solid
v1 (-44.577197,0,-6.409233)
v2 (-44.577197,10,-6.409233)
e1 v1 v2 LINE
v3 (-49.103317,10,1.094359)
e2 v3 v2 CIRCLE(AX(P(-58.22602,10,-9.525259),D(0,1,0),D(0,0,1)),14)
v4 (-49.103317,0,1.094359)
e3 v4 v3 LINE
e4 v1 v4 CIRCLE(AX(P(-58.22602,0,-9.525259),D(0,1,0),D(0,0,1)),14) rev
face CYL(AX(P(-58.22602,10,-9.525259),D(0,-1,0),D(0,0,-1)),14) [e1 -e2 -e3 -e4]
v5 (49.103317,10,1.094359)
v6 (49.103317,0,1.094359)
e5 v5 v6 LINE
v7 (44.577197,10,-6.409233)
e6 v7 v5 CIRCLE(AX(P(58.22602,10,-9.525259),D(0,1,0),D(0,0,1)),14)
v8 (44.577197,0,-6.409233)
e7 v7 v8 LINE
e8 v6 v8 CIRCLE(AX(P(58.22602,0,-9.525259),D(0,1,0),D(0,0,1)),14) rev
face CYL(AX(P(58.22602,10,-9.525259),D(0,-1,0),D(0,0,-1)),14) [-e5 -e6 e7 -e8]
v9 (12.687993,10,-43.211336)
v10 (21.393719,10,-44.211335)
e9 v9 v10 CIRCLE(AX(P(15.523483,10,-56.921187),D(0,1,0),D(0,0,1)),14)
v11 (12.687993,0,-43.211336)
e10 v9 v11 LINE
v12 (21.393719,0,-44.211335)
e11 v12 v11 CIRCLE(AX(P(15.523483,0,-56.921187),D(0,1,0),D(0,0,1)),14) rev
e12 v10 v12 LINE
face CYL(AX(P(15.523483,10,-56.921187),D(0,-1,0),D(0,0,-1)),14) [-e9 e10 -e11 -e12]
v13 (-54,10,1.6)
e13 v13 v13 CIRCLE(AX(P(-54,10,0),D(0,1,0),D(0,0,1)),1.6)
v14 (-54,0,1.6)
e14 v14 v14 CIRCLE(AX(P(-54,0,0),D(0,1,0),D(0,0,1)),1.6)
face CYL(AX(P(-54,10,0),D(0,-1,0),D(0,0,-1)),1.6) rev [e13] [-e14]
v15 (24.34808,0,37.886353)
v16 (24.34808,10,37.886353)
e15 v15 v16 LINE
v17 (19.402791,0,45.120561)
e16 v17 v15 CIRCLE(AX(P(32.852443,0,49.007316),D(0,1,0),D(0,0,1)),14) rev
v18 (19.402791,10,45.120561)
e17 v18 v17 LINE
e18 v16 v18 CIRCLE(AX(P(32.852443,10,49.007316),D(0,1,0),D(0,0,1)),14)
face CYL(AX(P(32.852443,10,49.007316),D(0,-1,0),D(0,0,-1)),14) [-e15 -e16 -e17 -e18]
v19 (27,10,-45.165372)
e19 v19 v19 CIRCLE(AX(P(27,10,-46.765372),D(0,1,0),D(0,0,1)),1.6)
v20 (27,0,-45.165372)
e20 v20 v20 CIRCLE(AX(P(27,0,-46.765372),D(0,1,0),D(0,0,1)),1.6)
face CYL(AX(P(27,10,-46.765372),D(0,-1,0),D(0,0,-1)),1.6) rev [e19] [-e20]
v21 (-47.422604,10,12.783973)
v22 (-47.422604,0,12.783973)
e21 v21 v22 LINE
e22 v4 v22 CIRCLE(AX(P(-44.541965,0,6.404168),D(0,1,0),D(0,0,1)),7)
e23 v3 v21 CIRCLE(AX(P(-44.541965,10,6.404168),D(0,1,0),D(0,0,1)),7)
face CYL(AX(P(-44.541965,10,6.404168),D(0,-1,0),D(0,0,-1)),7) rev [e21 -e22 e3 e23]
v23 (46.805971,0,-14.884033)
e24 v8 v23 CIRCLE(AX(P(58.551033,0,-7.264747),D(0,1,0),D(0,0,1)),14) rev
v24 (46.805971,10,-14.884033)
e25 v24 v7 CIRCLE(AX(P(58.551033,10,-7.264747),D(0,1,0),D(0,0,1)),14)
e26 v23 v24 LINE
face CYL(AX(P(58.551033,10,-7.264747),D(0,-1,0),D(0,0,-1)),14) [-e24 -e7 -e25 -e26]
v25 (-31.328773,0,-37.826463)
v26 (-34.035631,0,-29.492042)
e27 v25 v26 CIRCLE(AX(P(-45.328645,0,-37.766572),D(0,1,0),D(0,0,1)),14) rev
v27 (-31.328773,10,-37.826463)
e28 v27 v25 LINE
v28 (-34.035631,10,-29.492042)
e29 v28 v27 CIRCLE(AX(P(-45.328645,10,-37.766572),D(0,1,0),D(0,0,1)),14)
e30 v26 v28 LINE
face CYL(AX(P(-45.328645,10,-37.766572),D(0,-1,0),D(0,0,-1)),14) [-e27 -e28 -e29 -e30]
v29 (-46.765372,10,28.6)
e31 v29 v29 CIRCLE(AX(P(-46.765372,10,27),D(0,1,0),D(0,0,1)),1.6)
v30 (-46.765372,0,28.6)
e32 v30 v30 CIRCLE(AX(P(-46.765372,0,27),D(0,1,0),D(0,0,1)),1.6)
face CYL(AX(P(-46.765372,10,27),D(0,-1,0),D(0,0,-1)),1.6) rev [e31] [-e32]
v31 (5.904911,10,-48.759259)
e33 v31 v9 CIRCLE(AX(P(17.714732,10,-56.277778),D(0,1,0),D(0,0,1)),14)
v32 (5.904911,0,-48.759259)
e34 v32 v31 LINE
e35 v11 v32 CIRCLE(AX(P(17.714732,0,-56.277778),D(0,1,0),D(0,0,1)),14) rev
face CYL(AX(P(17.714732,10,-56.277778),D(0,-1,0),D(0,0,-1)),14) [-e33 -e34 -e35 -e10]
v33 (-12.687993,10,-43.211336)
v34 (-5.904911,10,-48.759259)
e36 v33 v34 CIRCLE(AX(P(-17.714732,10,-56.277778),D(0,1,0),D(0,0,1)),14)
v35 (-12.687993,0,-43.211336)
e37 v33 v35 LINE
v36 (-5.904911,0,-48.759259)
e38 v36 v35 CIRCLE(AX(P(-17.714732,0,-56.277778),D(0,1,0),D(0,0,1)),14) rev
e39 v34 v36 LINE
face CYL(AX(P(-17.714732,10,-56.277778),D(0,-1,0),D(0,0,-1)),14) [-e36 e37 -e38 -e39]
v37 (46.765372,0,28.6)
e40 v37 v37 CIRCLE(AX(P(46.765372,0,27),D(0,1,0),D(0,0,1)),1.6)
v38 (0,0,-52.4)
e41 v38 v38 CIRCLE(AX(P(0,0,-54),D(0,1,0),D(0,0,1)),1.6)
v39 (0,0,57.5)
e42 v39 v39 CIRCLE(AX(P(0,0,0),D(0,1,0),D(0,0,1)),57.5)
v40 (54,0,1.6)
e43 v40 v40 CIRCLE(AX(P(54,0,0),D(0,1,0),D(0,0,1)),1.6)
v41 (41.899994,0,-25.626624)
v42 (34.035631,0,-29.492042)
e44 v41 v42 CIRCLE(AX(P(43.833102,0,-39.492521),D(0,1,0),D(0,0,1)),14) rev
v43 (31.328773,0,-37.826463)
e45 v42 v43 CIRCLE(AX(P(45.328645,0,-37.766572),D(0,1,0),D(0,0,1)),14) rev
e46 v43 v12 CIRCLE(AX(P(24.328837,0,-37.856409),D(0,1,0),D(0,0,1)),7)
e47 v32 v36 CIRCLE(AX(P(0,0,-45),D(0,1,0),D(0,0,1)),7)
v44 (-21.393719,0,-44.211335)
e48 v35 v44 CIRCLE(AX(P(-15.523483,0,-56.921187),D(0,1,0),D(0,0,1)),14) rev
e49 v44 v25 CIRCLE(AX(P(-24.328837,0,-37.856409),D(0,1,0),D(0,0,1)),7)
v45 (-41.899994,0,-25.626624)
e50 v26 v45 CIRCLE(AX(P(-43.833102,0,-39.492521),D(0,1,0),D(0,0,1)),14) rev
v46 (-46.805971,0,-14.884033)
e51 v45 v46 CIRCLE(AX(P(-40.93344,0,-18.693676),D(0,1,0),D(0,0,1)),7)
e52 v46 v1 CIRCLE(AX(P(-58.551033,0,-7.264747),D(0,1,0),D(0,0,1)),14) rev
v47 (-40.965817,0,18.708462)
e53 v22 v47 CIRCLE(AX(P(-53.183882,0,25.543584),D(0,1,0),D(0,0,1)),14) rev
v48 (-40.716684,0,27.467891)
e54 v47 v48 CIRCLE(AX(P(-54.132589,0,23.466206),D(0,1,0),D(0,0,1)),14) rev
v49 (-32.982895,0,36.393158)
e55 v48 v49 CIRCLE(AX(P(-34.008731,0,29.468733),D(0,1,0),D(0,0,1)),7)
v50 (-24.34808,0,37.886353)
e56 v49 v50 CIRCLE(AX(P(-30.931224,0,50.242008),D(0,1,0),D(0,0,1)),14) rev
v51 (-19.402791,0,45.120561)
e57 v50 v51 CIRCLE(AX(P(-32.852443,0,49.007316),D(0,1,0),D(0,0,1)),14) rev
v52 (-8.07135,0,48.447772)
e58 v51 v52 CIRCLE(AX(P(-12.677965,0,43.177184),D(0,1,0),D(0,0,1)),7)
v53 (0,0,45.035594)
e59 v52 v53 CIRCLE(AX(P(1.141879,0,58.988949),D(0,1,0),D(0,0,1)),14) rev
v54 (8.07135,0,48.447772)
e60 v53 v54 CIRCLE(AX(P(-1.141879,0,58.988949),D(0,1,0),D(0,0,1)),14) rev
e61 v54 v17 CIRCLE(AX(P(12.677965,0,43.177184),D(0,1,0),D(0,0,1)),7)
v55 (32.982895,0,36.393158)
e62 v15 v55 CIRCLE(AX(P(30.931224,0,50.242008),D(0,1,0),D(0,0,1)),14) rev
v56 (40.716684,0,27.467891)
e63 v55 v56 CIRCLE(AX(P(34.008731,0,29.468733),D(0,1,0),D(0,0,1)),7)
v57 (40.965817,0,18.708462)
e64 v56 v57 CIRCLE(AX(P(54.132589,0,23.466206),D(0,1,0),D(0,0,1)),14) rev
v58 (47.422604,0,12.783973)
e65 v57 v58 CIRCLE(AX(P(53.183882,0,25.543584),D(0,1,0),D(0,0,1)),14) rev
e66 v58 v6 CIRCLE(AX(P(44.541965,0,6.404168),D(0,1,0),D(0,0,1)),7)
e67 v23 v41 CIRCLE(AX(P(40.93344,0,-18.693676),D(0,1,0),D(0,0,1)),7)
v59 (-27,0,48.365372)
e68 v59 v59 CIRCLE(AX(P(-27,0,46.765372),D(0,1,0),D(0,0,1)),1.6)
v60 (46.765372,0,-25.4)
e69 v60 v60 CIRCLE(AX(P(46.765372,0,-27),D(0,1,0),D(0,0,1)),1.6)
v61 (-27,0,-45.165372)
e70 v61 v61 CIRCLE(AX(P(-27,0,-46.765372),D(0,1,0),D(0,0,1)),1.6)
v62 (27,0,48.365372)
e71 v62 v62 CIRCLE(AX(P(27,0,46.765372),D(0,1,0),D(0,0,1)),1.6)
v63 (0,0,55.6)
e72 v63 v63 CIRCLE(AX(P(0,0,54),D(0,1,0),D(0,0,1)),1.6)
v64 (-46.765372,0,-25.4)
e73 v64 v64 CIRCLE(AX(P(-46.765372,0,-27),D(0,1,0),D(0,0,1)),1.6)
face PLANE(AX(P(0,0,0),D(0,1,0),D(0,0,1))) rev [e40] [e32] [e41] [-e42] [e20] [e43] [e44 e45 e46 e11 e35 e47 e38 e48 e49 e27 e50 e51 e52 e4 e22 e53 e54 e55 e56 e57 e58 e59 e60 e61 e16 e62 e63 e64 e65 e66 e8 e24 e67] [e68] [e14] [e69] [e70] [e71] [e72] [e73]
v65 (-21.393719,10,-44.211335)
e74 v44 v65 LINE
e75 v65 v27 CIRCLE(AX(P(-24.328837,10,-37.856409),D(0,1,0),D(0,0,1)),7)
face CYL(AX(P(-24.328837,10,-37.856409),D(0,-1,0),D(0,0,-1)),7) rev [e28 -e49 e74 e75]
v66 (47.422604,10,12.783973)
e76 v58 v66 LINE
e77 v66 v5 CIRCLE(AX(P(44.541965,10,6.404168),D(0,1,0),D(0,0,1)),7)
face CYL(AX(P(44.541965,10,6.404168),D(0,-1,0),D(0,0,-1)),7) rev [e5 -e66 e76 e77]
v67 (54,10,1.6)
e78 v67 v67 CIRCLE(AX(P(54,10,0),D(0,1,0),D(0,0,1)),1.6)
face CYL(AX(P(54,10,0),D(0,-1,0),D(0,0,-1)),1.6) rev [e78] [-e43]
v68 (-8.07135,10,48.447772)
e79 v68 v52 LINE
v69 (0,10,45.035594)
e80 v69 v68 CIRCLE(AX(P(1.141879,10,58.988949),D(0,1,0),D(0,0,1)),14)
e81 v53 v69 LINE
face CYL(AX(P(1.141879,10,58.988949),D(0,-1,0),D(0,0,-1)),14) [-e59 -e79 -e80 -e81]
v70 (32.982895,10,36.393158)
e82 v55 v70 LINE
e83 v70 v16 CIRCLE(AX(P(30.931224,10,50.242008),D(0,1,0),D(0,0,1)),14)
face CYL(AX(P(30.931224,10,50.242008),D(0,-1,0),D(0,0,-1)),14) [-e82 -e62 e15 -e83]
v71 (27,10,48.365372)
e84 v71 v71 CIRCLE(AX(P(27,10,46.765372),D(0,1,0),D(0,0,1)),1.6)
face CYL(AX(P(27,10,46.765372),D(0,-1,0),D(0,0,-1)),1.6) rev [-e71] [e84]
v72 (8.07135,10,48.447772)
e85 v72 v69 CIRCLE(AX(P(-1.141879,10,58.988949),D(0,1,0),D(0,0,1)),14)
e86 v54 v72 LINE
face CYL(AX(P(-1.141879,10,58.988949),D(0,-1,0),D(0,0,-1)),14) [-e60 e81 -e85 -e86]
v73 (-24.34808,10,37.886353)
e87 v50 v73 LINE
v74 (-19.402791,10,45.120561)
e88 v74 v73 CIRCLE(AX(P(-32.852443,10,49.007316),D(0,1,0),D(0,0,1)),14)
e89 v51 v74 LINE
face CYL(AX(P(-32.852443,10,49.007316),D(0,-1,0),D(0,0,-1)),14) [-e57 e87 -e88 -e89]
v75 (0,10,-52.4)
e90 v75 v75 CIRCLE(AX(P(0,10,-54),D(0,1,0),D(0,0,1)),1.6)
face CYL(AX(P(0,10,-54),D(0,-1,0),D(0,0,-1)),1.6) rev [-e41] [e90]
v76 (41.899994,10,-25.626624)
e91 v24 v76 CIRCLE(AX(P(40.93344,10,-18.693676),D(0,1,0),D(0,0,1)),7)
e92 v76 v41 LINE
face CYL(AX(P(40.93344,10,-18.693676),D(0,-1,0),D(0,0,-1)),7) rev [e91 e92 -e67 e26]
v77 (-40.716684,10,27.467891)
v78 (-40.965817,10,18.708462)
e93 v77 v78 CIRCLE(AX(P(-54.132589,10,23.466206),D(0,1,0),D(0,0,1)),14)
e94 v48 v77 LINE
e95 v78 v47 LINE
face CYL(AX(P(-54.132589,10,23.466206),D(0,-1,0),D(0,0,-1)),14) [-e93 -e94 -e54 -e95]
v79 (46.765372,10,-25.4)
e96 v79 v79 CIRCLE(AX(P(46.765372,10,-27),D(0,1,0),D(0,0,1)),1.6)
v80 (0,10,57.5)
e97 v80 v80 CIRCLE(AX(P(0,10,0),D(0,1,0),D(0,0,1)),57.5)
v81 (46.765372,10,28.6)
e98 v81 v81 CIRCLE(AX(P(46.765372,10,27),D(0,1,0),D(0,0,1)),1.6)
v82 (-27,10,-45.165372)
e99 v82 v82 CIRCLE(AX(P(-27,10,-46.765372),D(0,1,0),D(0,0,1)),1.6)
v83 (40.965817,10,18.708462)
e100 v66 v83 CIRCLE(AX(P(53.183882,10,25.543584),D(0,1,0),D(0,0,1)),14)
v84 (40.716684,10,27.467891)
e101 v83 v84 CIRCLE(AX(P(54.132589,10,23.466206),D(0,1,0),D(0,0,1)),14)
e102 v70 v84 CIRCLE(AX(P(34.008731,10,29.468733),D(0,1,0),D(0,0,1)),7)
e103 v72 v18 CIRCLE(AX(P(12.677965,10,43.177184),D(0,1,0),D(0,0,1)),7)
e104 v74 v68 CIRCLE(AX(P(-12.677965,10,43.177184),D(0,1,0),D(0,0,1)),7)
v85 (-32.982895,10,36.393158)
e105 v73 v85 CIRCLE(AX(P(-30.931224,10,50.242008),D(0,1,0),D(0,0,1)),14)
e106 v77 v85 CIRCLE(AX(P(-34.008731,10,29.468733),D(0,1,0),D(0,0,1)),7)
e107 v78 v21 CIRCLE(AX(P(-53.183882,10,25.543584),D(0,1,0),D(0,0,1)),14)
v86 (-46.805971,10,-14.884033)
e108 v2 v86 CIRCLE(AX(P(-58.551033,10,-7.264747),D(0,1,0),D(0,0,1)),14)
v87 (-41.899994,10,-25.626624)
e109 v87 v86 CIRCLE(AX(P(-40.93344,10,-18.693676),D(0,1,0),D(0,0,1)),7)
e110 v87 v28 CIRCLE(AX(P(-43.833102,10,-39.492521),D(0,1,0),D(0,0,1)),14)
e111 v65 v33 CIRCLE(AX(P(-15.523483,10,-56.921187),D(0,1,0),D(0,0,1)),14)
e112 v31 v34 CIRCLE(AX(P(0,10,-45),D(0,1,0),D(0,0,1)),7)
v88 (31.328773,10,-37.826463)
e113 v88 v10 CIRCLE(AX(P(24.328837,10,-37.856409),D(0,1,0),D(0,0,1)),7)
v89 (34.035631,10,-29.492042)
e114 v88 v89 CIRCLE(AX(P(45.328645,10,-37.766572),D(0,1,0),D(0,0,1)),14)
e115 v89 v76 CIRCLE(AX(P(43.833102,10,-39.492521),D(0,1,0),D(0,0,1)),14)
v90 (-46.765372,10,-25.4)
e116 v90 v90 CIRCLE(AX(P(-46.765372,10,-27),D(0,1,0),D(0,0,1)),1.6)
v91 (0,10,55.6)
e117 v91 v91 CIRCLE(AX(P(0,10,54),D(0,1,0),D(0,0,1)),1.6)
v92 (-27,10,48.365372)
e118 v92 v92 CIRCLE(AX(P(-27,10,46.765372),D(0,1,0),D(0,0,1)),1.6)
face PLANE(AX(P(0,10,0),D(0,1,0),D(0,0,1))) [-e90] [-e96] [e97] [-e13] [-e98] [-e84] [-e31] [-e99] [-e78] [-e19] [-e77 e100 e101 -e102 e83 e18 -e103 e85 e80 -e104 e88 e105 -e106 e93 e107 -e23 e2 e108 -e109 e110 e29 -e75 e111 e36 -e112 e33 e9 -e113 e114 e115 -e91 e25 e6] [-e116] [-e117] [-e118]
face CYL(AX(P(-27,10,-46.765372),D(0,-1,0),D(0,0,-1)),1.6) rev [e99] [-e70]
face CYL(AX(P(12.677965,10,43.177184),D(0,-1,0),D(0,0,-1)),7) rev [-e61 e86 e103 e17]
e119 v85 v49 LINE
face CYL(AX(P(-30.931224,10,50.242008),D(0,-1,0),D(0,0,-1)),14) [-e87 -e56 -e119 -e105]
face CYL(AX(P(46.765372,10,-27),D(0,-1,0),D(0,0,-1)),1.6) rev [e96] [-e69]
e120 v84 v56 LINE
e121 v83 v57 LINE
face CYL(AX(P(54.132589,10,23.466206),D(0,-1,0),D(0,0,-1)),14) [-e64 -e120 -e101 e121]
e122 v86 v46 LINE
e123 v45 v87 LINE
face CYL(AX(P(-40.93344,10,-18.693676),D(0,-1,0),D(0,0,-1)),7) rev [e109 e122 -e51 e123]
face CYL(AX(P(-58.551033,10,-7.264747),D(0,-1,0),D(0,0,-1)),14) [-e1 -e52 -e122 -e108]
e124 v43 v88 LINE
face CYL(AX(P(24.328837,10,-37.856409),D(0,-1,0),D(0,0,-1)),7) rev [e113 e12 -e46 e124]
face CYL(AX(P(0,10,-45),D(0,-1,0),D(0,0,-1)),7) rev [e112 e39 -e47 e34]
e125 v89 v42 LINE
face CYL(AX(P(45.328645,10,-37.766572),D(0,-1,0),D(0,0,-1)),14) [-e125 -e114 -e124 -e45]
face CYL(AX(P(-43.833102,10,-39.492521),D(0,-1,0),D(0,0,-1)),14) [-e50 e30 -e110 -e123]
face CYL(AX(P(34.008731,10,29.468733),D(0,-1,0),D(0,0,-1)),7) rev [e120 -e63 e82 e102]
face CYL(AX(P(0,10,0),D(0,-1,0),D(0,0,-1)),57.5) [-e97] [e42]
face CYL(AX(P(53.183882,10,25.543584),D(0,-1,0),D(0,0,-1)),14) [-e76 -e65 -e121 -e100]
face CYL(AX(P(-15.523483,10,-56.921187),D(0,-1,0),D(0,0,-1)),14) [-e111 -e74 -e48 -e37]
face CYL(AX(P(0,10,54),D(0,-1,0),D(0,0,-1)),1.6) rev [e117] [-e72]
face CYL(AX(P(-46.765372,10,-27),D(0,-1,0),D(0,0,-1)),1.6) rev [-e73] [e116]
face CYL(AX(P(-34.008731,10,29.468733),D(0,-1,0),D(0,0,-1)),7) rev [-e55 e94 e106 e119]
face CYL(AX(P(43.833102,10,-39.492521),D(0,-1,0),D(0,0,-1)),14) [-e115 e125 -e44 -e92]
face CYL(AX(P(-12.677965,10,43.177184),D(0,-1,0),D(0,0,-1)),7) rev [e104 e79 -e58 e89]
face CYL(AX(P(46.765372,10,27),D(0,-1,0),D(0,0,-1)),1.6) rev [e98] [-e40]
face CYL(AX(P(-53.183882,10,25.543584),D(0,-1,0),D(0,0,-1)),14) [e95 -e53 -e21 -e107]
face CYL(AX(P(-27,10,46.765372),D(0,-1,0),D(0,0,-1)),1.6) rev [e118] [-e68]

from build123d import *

# Parameters (mm, degrees)
SKETCH1_R           = 57.5
SKETCH1_R_2         = 1.6
BOSS_EXTRUDE1_DEPTH = 10
FILLET1_R           = 14


with BuildPart() as part:
    # Sketch1 → Boss-Extrude1 (new body)
    with BuildSketch(Plane(origin=(0, 0, 0), x_dir=(1, 0, 0), z_dir=(0, 1, 0))):
        with Locations(Location((0, 0, 0), (0, 0, 270))):
            Circle(SKETCH1_R)
        with Locations(Location((-27, -46.765371804, 0), (0, 0, 270))):
            Circle(SKETCH1_R_2, mode=Mode.SUBTRACT)
        with Locations(Location((-46.765371804, -27, 0), (0, 0, 270))):
            Circle(SKETCH1_R_2, mode=Mode.SUBTRACT)
        with Locations(Location((-54, 0, 0), (0, 0, 270))):
            Circle(SKETCH1_R_2, mode=Mode.SUBTRACT)
        with Locations(Location((0, -54, 0), (0, 0, 270))):
            Circle(SKETCH1_R_2, mode=Mode.SUBTRACT)
        with Locations(Location((27, -46.765371804, 0), (0, 0, 270))):
            Circle(SKETCH1_R_2, mode=Mode.SUBTRACT)
        with Locations(Location((46.765371804, -27, 0), (0, 0, 270))):
            Circle(SKETCH1_R_2, mode=Mode.SUBTRACT)
        with Locations(Location((-46.765371804, 27, 0), (0, 0, 270))):
            Circle(SKETCH1_R_2, mode=Mode.SUBTRACT)
        with Locations(Location((-27, 46.765371804, 0), (0, 0, 270))):
            Circle(SKETCH1_R_2, mode=Mode.SUBTRACT)
        with BuildLine():
            ThreePointArc((43.337291938, 12.119369929), (44.541964885, 6.404167722), (44.996248187, 0.581075772))
            ThreePointArc((44.996248187, 0.581075772), (49.649801174, -1.617727663), (51.541964885, -6.404167722))
            ThreePointArc((51.541964885, -6.404167722), (48.916629323, -11.868809619), (43.009876012, -13.234446171))
            ThreePointArc((43.009876012, -13.234446171), (40.933439791, -18.693675585), (38.167406032, -23.837976356))
            ThreePointArc((38.167406032, -23.837976356), (40.258159872, -26.3152212), (41.008730846, -29.468733028))
            ThreePointArc((41.008730846, -29.468733028), (36.666623102, -35.944503928), (29.027128345, -34.386419122))
            ThreePointArc((29.027128345, -34.386419122), (24.328836786, -37.856408977), (19.22068214, -40.688639423))
            ThreePointArc((19.22068214, -40.688639423), (19.562695248, -41.91207899), (19.677965058, -43.177183813))
            ThreePointArc((19.677965058, -43.177183813), (13.403758509, -50.139455271), (5.828472525, -44.620946965))
            ThreePointArc((5.828472525, -44.620946965), (0, -45), (-5.828472525, -44.620946965))
            ThreePointArc((-5.828472525, -44.620946965), (-14.650092956, -49.893634628), (-19.22068214, -40.688639423))
            ThreePointArc((-19.22068214, -40.688639423), (-24.328836785, -37.856408977), (-29.027128345, -34.386419122))
            ThreePointArc((-29.027128345, -34.386419122), (-39.298977866, -34.052758165), (-38.167406032, -23.837976356))
            ThreePointArc((-38.167406032, -23.837976356), (-40.933439791, -18.693675585), (-43.009876012, -13.234446171))
            ThreePointArc((-43.009876012, -13.234446171), (-51.470714978, -7.40037159), (-44.996248187, 0.581075772))
            ThreePointArc((-44.996248187, 0.581075772), (-44.541964885, 6.404167722), (-43.337291938, 12.119369929))
            ThreePointArc((-43.337291938, 12.119369929), (-47.300863758, 21.601580676), (-37.539099471, 24.815640449))
            ThreePointArc((-37.539099471, 24.815640449), (-34.008730846, 29.468733028), (-29.905423881, 33.625371708))
            ThreePointArc((-29.905423881, 33.625371708), (-28.113322508, 43.745183707), (-18.163551911, 41.171414622))
            ThreePointArc((-18.163551911, 41.171414622), (-12.677965058, 43.177183813), (-6.978795043, 44.455555556))
            ThreePointArc((-6.978795043, 44.455555556), (-0.272428616, 51.994696752), (7, 45))
            ThreePointArc((7, 45), (6.994696752, 44.727571384), (6.978795043, 44.455555556))
            ThreePointArc((6.978795043, 44.455555556), (12.677965058, 43.177183813), (18.163551911, 41.171414622))
            ThreePointArc((18.163551911, 41.171414622), (26.038077243, 44.644523374), (31.328836786, 37.856408977))
            ThreePointArc((31.328836786, 37.856408977), (30.963447161, 35.624381834), (29.905423881, 33.625371708))
            ThreePointArc((29.905423881, 33.625371708), (34.008730846, 29.468733028), (37.539099471, 24.815640449))
            ThreePointArc((37.539099471, 24.815640449), (44.485876825, 24.725274968), (47.933439791, 18.693675585))
            ThreePointArc((47.933439791, 18.693675585), (46.670467115, 14.68287548), (43.337291938, 12.119369929))
        make_face(mode=Mode.SUBTRACT)
        with Locations(Location((54, 0, 0), (0, 0, 270))):
            Circle(SKETCH1_R_2, mode=Mode.SUBTRACT)
        with Locations(Location((46.765371804, 27, 0), (0, 0, 270))):
            Circle(SKETCH1_R_2, mode=Mode.SUBTRACT)
        with Locations(Location((0, 54, 0), (0, 0, 270))):
            Circle(SKETCH1_R_2, mode=Mode.SUBTRACT)
        with Locations(Location((27, 46.765371804, 0), (0, 0, 270))):
            Circle(SKETCH1_R_2, mode=Mode.SUBTRACT)
    extrude(amount=BOSS_EXTRUDE1_DEPTH)

    # Fillet1
    # the kernel refuses this fillet: 14 mm, written as the material it takes off along each edge
    with BuildSketch(Plane(origin=(43.009876012, -16.77410228, 13.234446171), x_dir=(-0.3645348982341331, 0, 0.9311897271605987), z_dir=(0, 1, 0)), Plane(origin=(43.337291938, -16.77410228, -12.119369929), x_dir=(0.19677290431862063, 0, 0.9804490930823564), z_dir=(0, 1, 0)), Plane(origin=(29.027128345, -16.77410228, 34.386419122), x_dir=(-0.8101054462780665, 0, 0.586284202337582), z_dir=(0, 1, 0)), Plane(origin=(5.828472525, -16.77410228, 44.620946965), x_dir=(-0.9984732390602963, 0, 0.05523758575861507), z_dir=(0, 1, 0)), Plane(origin=(-19.22068214, -16.77410228, 40.688639423), x_dir=(-0.8698328333156817, 0, -0.4933465740085904), z_dir=(0, 1, 0)), Plane(origin=(-38.167406032, -16.77410228, 23.837976356), x_dir=(-0.46502664893844664, 0, -0.8852966823483972), z_dir=(0, 1, 0)), Plane(origin=(-44.996248187, -16.77410228, -0.581075772), x_dir=(0.0874222107554752, 0, -0.99617134925003), z_dir=(0, 1, 0)), Plane(origin=(-37.539099471, -16.77410228, -24.815640449), x_dir=(0.6121151362303556, 0, -0.7907686513751624), z_dir=(0, 1, 0)), Plane(origin=(-18.163551911, -16.77410228, -41.171414622), x_dir=(0.9424658309509625, 0, -0.334302493992958), z_dir=(0, 1, 0)), Plane(origin=(6.978795043, -16.77410228, -44.455555556), x_dir=(0.9735902834899675, 0, 0.22830234316345693), z_dir=(0, 1, 0))) as fillet1_piece_1:
        with BuildLine():
            CenterArc((7.753362832, 13.961040239), FILLET1_R, 225.679308165, 40.045235058)
            ThreePointArc((-2.028069047, 3.944873787), (-0.693306264, 2.137324059), (0, 0))
            ThreePointArc((0, 0), (3.354820456, 0.125227803), (6.709640912, 0))
        make_face()
    extrude(amount=43.54820456, mode=Mode.SUBTRACT)
    with BuildSketch(Plane(origin=(44.996248187, -16.77410228, -0.581075772), x_dir=(0.9259201789863998, 0, 0.37771923719317424), z_dir=(0, 1, 0)), Plane(origin=(37.539099471, -16.77410228, -24.815640449), x_dir=(0.9831440588568181, 0, -0.18283259975874497), z_dir=(0, 1, 0)), Plane(origin=(38.167406032, -16.77410228, 23.837976356), x_dir=(0.5747231845271455, 0, 0.8183478851729116), z_dir=(0, 1, 0)), Plane(origin=(19.22068214, -16.77410228, 40.688639423), x_dir=(0.041055639780420296, 0, 0.9991568617800813), z_dir=(0, 1, 0)), Plane(origin=(-5.828472525, -16.77410228, 44.620946965), x_dir=(-0.5056467805113274, 0, 0.8627405944770012), z_dir=(0, 1, 0)), Plane(origin=(-29.027128345, -16.77410228, 34.386419122), x_dir=(-0.8918099207200904, 0, 0.4524102842611189), z_dir=(0, 1, 0)), Plane(origin=(-43.009876012, -16.77410228, 13.234446171), x_dir=(-0.994829712327915, 0, -0.10155709462936494), z_dir=(0, 1, 0)), Plane(origin=(-43.337291938, -16.77410228, -12.119369929), x_dir=(-0.7819980994024467, 0, -0.62328081354311), z_dir=(0, 1, 0)), Plane(origin=(-29.905423881, -16.77410228, -33.625371708), x_dir=(-0.3208876152512941, 0, -0.9471172780486783), z_dir=(0, 1, 0)), Plane(origin=(18.163551911, -16.77410228, -41.171414622), x_dir=(0.7282266466043301, 0, -0.6853363781205636), z_dir=(0, 1, 0)), Plane(origin=(-6.978795043, -16.77410228, -44.455555556), x_dir=(0.24210241945853378, 0, -0.9702506987847646), z_dir=(0, 1, 0))) as fillet1_piece_2:
        with BuildLine():
            CenterArc((8.87132307, 13.278738899), FILLET1_R, 211.483261097, 40.045235058)
            ThreePointArc((-3.067775786, 5.967246676), (-1.422516032, 3.040879878), (0, 0))
            ThreePointArc((0, 0), (2.217830767, 0.36063055), (4.435661535, 0))
        make_face()
    extrude(amount=43.54820456, mode=Mode.SUBTRACT)
    with BuildSketch(Plane(origin=(29.905423881, -16.77410228, -33.625371708), x_dir=(0.3208876152513925, 0, -0.9471172780486449), z_dir=(0, 1, 0))) as fillet1_piece_3:
        with BuildLine():
            CenterArc((8.87132307, -13.278738899), FILLET1_R, 108.471503845, 40.045235058)
            ThreePointArc((-3.067775786, -5.967246676), (-1.422516032, -3.040879878), (0, 0))
            ThreePointArc((0, 0), (2.217830767, -0.36063055), (4.435661535, 0))
        make_face()
    extrude(amount=43.54820456, mode=Mode.SUBTRACT)


solid = part.part
